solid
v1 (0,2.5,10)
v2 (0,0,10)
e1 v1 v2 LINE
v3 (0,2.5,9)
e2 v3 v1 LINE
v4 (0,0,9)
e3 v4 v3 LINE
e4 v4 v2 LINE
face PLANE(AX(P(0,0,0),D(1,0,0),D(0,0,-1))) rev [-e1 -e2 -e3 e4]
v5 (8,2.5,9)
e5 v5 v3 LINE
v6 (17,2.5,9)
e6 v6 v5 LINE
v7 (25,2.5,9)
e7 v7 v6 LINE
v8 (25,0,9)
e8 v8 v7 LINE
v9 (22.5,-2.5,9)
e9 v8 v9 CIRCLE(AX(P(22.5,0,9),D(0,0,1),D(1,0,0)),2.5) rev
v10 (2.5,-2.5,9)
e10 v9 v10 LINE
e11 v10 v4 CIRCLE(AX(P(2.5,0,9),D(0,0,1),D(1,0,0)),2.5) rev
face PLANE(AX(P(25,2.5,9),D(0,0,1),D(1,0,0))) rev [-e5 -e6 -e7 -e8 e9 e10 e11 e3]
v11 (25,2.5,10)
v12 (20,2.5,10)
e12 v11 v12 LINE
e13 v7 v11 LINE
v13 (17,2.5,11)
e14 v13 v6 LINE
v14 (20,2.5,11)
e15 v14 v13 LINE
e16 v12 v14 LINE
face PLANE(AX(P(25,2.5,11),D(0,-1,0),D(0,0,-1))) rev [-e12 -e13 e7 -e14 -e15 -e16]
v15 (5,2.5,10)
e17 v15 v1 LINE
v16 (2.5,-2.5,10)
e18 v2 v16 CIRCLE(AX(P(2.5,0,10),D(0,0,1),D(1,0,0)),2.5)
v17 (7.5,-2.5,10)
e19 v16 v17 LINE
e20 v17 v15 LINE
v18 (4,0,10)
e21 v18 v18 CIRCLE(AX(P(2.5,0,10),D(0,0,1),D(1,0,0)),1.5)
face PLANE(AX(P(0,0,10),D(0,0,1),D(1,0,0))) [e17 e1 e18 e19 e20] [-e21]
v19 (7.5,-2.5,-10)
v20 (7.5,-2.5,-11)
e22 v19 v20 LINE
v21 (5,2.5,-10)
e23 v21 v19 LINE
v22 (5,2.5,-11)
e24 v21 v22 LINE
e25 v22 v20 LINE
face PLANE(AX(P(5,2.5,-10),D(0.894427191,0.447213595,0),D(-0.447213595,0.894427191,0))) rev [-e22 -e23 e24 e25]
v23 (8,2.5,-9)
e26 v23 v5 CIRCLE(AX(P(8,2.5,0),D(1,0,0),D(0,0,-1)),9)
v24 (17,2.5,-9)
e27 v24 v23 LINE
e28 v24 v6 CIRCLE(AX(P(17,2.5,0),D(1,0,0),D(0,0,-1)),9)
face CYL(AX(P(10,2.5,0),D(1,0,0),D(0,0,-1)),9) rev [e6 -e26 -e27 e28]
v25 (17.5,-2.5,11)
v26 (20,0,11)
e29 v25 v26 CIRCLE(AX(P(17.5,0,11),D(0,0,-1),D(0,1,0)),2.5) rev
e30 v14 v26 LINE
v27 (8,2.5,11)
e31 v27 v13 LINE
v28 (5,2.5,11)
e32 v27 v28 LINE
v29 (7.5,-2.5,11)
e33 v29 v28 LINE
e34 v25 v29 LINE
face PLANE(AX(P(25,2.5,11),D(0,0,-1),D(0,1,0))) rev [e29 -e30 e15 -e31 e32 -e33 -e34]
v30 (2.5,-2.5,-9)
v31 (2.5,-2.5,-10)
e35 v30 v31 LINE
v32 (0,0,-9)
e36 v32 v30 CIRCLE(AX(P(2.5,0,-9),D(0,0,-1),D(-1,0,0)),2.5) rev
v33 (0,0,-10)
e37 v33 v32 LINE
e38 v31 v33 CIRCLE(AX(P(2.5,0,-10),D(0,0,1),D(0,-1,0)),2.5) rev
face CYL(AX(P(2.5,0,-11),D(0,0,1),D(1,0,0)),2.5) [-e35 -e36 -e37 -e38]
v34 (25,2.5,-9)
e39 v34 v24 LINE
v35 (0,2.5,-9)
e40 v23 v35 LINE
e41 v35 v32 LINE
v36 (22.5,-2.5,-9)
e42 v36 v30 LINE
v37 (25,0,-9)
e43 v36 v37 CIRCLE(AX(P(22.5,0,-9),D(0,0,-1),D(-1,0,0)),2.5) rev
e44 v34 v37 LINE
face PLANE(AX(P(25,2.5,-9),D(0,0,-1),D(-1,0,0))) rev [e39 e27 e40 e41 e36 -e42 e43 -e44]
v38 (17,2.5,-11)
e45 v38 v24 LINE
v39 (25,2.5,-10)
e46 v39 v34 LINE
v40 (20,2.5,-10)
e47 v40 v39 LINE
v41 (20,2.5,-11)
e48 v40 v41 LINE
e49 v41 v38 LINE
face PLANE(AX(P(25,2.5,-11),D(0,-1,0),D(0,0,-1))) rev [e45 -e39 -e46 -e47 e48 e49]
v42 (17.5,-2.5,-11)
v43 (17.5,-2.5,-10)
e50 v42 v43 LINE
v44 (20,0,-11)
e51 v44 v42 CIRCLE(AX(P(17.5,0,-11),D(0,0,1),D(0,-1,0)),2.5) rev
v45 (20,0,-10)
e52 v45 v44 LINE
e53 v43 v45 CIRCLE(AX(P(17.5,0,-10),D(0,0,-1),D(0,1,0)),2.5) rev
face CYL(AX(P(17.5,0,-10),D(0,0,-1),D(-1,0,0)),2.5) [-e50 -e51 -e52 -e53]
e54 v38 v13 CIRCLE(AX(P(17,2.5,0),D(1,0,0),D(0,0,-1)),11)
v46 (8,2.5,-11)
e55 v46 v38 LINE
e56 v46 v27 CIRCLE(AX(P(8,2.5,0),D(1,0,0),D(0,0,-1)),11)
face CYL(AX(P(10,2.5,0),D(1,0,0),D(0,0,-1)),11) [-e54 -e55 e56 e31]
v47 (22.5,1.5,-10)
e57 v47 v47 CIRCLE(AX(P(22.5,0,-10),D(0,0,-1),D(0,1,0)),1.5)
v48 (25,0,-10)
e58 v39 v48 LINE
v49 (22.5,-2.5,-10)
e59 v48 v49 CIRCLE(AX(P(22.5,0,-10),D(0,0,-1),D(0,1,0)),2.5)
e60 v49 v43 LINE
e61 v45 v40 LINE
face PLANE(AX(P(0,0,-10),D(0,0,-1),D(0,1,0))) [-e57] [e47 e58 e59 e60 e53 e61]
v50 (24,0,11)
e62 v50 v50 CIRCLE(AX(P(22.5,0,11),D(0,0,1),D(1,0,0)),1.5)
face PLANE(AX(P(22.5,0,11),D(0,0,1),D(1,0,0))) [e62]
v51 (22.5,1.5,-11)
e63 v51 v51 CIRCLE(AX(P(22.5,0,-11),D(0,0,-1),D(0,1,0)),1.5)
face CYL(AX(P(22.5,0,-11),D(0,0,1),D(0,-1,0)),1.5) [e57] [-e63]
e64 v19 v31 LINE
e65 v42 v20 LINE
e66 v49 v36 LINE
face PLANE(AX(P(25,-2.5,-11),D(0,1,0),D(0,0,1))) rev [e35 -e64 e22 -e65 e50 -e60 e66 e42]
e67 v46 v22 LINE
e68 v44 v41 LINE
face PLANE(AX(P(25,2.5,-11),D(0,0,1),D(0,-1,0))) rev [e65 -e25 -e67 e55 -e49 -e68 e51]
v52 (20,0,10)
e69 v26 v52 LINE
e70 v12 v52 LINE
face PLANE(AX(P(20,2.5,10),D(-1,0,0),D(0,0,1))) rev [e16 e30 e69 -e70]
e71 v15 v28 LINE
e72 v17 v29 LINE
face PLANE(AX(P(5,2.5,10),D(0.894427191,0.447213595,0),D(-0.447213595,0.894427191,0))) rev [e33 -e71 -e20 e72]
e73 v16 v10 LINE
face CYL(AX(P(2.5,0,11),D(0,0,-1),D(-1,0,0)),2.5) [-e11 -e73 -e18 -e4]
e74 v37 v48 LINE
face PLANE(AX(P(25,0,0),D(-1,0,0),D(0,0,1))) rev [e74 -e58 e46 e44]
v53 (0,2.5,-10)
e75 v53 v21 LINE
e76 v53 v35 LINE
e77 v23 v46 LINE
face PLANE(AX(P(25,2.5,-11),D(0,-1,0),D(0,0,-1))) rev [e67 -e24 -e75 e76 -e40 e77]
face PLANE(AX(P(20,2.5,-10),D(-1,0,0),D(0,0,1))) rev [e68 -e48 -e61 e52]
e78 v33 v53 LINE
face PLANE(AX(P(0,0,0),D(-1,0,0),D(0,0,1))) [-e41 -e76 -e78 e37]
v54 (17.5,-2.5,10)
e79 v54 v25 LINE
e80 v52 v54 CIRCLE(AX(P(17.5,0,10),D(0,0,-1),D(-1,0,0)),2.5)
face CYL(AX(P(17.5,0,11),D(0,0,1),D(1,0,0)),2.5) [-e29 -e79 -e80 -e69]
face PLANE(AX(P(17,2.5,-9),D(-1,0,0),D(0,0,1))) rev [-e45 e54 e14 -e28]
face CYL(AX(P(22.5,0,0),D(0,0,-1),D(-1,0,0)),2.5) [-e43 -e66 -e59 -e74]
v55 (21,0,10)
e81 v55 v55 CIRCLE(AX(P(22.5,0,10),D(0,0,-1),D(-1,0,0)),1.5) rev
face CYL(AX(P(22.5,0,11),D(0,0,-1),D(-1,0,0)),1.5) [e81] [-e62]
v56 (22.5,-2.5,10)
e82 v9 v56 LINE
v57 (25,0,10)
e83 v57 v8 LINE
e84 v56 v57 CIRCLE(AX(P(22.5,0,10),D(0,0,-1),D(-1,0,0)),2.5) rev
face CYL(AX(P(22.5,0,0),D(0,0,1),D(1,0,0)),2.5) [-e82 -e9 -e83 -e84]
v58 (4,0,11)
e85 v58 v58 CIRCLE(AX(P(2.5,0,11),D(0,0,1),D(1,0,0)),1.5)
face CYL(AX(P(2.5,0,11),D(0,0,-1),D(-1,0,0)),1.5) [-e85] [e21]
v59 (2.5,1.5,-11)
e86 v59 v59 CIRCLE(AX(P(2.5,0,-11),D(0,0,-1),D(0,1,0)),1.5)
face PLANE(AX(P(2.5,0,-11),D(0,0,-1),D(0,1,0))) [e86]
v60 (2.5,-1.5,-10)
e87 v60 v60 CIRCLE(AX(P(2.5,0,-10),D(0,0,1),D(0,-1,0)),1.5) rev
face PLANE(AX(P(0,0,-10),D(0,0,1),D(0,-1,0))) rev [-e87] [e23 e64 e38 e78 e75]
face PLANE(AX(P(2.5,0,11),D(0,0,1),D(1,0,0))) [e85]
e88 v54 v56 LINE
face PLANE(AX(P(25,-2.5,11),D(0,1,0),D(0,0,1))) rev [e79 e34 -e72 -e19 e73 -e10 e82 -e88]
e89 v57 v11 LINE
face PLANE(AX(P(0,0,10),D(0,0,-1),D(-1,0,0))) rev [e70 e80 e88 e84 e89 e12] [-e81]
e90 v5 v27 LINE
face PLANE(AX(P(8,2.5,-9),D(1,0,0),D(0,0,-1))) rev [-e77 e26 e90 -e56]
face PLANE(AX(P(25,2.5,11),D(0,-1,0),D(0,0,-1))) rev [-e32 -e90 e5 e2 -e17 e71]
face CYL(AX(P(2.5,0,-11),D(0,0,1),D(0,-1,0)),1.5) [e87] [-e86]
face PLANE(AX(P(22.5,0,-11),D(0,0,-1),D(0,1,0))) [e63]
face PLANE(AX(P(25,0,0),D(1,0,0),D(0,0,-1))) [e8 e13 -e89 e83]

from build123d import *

# Parameters (mm, degrees)
SKETCH3_W             = 2
SKETCH3_H             = 5
BOSS_EXTRUDE1_DEPTH   = 25
BOSS_EXTRUDE1_2_DEPTH = 25
SKETCH4_W             = 5
SKETCH4_H             = 5
CUT_EXTRUDE1_DEPTH    = 1
SKETCH5_W             = 5
SKETCH5_H             = 5
CUT_EXTRUDE2_DEPTH    = 1
SWEEP1_START          = 8
SWEEP1_DEPTH          = 9
SKETCH7_R             = 1.5
BOSS_EXTRUDE2_DEPTH   = 1
BOSS_EXTRUDE3_START   = 1
SKETCH8_R             = 1.5
BOSS_EXTRUDE3_DEPTH   = 1
FILLET1_R             = 2.5
CUT_EXTRUDE3_DEPTH    = 1
CUT_EXTRUDE4_DEPTH    = 1
FILLET2_R             = 2.5


# Read off the part's stored shape, not the designer's step: Sweep1
with BuildPart() as part:
    # Sketch3 → Boss-Extrude1 (new body)
    with BuildSketch(Plane(origin=(0, 0, 0), x_dir=(0, 0, -1), z_dir=(1, 0, 0))):
        with Locations((-10, 0)):
            Rectangle(SKETCH3_W, SKETCH3_H)
    extrude(amount=BOSS_EXTRUDE1_DEPTH)

    # Sketch4 → Cut-Extrude1 (cut)
    with BuildSketch(Plane.XY.offset(11)):
        with Locations((2.5, 0)):
            Rectangle(SKETCH4_W, SKETCH4_H)
        with Locations((22.5, 0)):
            Rectangle(SKETCH4_W, SKETCH4_H)
    extrude(amount=-CUT_EXTRUDE1_DEPTH, mode=Mode.SUBTRACT)



with BuildPart() as body_2:
    # Sketch3 → Boss-Extrude1 2 (new body)
    with BuildSketch(Plane(origin=(0, 0, 0), x_dir=(0, 0, -1), z_dir=(1, 0, 0))):
        with Locations((10, 0)):
            Rectangle(SKETCH3_W, SKETCH3_H)
    extrude(amount=BOSS_EXTRUDE1_2_DEPTH)

    # Sketch5 → Cut-Extrude2 (cut)
    with BuildSketch(Plane(origin=(0, 0, -11), x_dir=(-1, 0, 0), z_dir=(0, 0, -1))):
        with Locations((-22.5, 0)):
            Rectangle(SKETCH5_W, SKETCH5_H)
        with Locations((-2.5, 0)):
            Rectangle(SKETCH5_W, SKETCH5_H)
    extrude(amount=-CUT_EXTRUDE2_DEPTH, mode=Mode.SUBTRACT)


with BuildPart() as part_1:
    add(part.part)

    add(body_2.part)  # Sweep1 merges body 2
    # Sweep1 outline → Sweep1 (add)
    with BuildSketch(Plane.YZ.offset(SWEEP1_START)):
        with BuildLine():
            Line((2.5, -9), (2.5, -11))
            ThreePointArc((2.5, -11), (13.5, 0), (2.5, 11))
            Line((2.5, 11), (2.5, 9))
            ThreePointArc((2.5, 9), (11.5, 0), (2.5, -9))
        make_face()
    extrude(amount=SWEEP1_DEPTH)

    # Sketch7 → Boss-Extrude2 (add)
    with BuildSketch(Plane(origin=(0, 0, -10), x_dir=(-1, 0, 0), z_dir=(0, 0, -1))):
        with Locations(Location((-2.5, 0, 0), (0, 0, 270))):
            Circle(SKETCH7_R)
        with Locations(Location((-22.5, 0, 0), (0, 0, 90))):
            Circle(SKETCH7_R)
    extrude(amount=BOSS_EXTRUDE2_DEPTH)

    # Sketch8 → Boss-Extrude3 (add)
    with BuildSketch(Plane.XY.offset(10).offset(BOSS_EXTRUDE3_START)):
        with Locations(Location((22.5, 0, 0), (0, 0, 90))):
            Circle(SKETCH8_R)
        with Locations(Location((2.5, 0, 0), (0, 0, 270))):
            Circle(SKETCH8_R)
    extrude(amount=-BOSS_EXTRUDE3_DEPTH)

    # Fillet1
    fillet1_edges = [part_1.edges().sort_by_distance(p)[0] for p in [
        (0, -2.5, 9.5),
        (25, -2.5, 9.5),
        (25, -2.5, -9.5),
        (0, -2.5, -9.5),
    ]]
    fillet(fillet1_edges, radius=FILLET1_R)

    # Sketch9 → Cut-Extrude3 (cut)
    with BuildSketch(Plane.XY.offset(11)):
        Polygon((5, 2.5), (7.5, -2.5), (5, -2.5), align=None)
    extrude(amount=-CUT_EXTRUDE3_DEPTH, mode=Mode.SUBTRACT)

    # Sketch10 → Cut-Extrude4 (cut)
    with BuildSketch(Plane(origin=(0, 0, -11), x_dir=(-1, 0, 0), z_dir=(0, 0, -1))):
        Polygon((-5, 2.5), (-7.5, -2.5), (-5, -2.5), align=None)
    extrude(amount=-CUT_EXTRUDE4_DEPTH, mode=Mode.SUBTRACT)

    # Fillet2
    fillet2_edges = [part_1.edges().sort_by_distance(p)[0] for p in [
        (20, -2.5, 10.5),
        (20, -2.5, -10.5),
    ]]
    fillet(fillet2_edges, radius=FILLET2_R)


solid = part_1.part
